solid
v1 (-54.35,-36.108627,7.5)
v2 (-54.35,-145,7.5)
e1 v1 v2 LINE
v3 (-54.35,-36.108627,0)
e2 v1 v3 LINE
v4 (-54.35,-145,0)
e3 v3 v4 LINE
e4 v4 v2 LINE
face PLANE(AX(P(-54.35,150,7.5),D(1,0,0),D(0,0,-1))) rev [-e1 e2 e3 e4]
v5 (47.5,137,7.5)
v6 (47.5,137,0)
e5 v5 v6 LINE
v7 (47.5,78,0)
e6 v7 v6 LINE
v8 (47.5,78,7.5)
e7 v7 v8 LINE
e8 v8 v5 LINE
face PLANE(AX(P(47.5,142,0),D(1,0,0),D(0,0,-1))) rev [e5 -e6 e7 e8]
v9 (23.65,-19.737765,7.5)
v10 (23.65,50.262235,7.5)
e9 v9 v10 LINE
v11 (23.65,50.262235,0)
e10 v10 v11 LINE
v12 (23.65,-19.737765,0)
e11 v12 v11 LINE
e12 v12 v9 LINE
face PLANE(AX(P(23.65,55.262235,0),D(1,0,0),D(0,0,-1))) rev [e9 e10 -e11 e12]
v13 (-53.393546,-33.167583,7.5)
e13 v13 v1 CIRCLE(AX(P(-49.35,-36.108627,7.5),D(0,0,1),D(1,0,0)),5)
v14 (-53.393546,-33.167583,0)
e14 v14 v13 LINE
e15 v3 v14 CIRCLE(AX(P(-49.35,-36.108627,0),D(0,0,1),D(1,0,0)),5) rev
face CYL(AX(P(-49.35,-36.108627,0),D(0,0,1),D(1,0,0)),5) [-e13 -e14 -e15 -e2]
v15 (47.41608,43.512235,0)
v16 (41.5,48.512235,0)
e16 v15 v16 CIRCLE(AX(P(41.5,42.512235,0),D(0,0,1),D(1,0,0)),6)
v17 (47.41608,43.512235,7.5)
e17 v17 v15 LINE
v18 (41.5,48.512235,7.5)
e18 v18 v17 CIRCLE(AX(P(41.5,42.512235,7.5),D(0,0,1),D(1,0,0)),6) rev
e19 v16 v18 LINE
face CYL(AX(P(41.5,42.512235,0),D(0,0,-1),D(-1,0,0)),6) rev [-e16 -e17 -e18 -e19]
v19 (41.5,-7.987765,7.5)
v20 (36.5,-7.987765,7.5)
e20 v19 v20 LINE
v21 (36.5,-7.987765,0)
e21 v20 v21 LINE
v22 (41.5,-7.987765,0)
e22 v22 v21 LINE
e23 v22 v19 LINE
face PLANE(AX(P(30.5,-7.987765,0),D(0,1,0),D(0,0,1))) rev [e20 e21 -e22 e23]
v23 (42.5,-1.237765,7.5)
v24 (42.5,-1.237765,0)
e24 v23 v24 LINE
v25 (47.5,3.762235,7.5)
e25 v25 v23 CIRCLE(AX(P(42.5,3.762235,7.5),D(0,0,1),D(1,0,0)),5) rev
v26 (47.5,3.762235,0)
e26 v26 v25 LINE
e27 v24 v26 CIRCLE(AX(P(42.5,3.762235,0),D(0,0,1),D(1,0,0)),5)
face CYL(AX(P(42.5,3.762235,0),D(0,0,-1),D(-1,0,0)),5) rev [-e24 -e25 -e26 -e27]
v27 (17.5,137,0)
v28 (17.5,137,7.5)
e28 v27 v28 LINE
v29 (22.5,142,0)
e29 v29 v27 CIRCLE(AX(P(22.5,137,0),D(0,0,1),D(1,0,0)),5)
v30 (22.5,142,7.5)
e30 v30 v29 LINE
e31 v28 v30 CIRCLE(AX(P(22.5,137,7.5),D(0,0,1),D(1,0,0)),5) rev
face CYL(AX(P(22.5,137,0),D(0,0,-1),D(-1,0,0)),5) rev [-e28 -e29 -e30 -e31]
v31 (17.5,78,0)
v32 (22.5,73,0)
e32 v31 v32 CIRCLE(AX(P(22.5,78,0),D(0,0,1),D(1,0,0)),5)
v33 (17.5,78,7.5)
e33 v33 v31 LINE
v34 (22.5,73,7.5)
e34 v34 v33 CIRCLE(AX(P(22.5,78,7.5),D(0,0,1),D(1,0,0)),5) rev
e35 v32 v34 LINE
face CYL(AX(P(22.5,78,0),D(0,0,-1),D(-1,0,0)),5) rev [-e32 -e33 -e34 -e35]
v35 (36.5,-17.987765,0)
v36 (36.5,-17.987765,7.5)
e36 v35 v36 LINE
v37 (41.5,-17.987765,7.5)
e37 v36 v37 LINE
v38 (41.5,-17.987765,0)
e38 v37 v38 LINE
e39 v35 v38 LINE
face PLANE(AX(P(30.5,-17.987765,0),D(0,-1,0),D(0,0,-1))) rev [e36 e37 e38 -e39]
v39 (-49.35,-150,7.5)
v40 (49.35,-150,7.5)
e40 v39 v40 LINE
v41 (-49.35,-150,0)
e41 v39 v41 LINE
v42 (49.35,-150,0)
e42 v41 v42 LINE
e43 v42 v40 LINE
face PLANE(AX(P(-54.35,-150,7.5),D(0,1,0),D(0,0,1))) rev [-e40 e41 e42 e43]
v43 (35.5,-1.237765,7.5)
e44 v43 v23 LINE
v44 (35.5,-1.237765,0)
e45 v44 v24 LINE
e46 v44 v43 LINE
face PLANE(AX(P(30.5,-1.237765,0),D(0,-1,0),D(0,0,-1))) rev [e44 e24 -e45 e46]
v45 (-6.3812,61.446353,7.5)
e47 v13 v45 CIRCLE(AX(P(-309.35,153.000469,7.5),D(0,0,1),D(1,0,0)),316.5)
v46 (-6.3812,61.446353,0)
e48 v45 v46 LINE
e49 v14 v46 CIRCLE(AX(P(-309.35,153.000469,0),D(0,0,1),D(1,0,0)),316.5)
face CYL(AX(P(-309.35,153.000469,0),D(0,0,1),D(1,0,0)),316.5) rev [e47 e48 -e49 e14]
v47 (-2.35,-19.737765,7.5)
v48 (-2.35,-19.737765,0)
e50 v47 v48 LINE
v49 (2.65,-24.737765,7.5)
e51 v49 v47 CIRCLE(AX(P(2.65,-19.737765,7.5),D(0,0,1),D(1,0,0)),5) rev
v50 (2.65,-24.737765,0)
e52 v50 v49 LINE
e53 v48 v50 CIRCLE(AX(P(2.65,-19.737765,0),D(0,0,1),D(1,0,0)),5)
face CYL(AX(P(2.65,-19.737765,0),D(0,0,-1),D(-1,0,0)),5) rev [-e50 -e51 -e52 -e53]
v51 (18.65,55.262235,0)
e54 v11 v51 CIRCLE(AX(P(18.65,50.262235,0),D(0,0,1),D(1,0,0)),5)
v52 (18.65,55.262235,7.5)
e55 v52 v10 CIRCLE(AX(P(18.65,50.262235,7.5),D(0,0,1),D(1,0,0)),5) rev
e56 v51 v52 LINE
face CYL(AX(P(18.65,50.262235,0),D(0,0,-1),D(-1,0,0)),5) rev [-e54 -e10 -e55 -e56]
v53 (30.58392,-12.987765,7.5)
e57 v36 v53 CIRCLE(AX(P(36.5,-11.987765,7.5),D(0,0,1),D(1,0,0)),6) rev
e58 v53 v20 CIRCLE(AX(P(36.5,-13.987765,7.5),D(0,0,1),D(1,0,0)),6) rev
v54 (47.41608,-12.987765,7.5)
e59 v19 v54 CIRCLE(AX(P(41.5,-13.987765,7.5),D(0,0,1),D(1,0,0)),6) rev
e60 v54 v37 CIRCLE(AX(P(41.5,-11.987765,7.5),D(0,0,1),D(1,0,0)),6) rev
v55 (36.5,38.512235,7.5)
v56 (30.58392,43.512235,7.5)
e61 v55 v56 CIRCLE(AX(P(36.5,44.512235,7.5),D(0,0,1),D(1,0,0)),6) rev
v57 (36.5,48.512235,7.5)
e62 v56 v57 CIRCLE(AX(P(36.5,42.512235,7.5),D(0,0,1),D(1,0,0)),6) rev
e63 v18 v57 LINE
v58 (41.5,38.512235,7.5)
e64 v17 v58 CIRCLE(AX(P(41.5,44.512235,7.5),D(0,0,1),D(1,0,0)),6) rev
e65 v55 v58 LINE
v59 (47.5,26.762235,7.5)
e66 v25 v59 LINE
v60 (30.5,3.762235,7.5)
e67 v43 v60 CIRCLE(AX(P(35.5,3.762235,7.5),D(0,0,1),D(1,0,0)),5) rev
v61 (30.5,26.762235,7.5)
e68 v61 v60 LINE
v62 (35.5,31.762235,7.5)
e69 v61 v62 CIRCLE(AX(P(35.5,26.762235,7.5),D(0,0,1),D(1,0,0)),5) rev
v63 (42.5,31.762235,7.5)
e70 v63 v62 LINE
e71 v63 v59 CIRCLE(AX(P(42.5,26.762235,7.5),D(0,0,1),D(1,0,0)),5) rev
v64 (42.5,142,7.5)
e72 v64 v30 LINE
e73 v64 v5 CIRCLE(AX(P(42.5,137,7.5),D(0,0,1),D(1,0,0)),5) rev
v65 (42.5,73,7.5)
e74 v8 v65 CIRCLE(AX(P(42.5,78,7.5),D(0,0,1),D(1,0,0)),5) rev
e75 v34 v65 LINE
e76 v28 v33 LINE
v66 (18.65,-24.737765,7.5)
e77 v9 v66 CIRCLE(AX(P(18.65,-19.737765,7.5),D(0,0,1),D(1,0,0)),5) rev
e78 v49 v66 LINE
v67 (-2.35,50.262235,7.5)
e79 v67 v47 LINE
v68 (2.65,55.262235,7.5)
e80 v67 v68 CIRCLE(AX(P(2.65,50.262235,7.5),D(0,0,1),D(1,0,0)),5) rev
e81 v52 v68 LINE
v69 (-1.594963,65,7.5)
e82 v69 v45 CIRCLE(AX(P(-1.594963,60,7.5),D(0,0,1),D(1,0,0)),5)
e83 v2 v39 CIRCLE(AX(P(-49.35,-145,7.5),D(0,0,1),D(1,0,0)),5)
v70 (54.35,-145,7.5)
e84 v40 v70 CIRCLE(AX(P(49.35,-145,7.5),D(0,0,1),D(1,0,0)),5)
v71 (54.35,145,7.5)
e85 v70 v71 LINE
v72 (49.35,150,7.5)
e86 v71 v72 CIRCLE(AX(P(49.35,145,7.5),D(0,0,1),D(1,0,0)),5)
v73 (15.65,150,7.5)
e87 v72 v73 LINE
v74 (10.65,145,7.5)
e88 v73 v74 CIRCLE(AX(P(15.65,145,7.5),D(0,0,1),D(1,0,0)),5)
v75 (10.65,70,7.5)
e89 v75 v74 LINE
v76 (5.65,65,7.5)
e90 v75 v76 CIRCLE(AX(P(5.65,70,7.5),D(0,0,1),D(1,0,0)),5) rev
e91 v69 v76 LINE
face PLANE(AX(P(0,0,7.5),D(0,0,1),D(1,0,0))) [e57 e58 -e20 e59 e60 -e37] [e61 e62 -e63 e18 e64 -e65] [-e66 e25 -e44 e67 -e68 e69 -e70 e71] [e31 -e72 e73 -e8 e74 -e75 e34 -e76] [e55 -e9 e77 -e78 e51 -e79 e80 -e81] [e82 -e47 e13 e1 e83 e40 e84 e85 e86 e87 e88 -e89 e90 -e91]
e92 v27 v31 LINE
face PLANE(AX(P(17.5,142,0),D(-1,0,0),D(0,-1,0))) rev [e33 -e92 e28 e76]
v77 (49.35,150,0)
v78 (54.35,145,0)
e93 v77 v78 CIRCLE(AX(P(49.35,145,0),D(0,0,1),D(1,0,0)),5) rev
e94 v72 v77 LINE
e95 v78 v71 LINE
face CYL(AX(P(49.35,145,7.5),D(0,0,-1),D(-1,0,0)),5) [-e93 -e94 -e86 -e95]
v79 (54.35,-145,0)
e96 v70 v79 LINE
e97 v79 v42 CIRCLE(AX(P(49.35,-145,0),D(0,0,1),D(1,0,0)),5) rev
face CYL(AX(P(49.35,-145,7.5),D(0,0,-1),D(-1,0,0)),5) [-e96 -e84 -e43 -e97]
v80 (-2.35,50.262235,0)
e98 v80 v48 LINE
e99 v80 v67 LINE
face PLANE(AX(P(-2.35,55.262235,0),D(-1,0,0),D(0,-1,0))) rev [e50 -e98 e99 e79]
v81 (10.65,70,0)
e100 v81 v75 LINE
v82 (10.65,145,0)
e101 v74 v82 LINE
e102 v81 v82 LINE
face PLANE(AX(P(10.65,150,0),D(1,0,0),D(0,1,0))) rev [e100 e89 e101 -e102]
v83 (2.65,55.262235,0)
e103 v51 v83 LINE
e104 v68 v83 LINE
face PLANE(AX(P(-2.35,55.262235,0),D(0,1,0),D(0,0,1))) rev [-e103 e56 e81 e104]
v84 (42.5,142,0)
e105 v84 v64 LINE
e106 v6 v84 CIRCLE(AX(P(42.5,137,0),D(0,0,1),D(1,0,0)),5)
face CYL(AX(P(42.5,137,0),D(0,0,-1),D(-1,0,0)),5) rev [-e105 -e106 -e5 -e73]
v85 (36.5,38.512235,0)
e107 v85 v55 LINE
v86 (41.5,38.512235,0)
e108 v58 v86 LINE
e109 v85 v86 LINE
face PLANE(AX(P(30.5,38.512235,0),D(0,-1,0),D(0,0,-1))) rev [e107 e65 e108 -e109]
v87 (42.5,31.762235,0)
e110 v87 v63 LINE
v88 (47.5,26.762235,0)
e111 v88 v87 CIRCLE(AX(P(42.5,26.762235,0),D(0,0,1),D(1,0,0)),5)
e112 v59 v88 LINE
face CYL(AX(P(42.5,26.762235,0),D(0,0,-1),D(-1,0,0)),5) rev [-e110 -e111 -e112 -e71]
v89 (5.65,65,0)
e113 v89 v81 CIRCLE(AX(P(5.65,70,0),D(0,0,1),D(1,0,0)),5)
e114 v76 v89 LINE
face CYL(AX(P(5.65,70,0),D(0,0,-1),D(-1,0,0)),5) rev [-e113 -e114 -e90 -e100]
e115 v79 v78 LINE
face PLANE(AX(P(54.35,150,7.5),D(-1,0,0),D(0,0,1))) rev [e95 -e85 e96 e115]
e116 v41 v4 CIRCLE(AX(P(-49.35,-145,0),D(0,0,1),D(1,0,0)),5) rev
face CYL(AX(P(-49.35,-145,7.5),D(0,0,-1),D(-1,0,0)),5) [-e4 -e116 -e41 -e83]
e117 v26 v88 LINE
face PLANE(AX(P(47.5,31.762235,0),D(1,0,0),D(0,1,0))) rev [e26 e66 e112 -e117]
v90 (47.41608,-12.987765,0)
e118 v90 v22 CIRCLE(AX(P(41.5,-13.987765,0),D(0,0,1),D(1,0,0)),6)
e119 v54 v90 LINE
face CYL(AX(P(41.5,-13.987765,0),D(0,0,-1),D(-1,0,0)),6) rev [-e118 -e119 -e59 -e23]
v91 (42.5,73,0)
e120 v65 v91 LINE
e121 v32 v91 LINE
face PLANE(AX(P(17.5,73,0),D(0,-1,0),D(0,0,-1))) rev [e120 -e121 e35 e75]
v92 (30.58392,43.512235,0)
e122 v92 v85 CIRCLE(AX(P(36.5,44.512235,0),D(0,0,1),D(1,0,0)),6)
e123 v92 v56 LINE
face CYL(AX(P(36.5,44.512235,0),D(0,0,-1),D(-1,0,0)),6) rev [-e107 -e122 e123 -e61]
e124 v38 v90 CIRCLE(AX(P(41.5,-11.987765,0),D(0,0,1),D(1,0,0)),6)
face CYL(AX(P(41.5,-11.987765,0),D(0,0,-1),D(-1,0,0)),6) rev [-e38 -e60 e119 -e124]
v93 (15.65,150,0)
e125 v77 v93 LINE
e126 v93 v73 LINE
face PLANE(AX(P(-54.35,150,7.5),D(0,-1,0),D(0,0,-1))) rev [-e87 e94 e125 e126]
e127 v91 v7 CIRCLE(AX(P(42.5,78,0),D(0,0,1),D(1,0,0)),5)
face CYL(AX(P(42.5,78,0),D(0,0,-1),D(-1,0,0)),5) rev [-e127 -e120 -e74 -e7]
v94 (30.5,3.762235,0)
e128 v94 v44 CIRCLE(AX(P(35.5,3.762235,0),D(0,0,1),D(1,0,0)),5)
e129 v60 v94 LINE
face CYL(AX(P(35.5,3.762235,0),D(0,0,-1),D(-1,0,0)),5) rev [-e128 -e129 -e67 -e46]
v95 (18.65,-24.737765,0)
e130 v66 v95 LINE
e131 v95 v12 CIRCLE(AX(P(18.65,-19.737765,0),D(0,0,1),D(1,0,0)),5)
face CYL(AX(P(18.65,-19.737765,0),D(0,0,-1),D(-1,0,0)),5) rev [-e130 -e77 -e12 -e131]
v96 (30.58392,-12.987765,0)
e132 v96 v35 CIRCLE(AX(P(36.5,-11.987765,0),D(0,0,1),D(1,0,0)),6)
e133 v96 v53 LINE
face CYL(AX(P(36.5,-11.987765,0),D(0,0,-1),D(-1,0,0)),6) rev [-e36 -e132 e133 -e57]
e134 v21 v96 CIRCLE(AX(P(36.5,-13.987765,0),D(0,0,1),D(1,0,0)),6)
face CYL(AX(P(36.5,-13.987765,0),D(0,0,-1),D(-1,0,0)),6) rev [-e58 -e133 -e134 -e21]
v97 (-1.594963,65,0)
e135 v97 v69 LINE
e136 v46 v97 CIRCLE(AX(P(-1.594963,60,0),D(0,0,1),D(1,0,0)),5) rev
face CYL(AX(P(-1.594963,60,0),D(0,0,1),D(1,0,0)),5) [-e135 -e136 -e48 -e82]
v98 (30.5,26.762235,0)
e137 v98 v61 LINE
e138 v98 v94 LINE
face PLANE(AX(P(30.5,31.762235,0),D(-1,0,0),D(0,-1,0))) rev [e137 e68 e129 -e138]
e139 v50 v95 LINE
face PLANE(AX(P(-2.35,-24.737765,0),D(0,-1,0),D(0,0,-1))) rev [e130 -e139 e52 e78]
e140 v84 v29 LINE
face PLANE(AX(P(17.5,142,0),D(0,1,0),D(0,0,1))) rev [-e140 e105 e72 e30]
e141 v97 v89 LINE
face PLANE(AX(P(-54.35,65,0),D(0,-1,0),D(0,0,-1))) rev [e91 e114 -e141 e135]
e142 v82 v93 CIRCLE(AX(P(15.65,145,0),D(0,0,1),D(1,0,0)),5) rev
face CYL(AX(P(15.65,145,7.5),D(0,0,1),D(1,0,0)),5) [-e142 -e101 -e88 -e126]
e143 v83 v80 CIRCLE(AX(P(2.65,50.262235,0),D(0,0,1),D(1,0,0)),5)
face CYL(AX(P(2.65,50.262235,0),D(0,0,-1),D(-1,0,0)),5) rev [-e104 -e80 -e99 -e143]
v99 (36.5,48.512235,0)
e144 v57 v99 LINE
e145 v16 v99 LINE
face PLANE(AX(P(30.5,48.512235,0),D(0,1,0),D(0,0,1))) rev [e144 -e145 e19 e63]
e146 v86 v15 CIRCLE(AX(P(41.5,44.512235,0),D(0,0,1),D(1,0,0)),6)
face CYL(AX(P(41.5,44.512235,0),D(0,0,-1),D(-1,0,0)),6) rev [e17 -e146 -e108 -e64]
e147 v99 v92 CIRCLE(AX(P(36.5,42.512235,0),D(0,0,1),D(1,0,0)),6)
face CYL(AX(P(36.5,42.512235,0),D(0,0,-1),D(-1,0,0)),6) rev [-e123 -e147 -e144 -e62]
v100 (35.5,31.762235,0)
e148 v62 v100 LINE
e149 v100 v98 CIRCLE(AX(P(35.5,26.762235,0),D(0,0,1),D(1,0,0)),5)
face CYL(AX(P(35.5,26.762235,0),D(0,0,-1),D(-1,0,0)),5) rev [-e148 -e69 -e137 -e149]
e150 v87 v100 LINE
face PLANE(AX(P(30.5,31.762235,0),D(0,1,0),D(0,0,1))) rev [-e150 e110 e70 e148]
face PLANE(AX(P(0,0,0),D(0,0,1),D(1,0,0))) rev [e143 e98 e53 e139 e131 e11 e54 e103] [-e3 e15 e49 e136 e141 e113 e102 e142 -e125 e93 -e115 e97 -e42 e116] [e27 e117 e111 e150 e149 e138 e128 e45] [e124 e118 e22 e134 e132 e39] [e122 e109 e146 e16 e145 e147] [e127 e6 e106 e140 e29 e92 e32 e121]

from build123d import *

# Parameters (mm, degrees)
SKETCH1_W           = 108.7
SKETCH1_H           = 300
BOSS_EXTRUDE1_DEPTH = 7.5
SKETCH2_W           = 65
SKETCH2_H           = 85
CUT_EXTRUDE1_DEPTH  = 7.5
CUT_EXTRUDE2_DEPTH  = 7.5
SKETCH5_W           = 30
SKETCH5_H           = 69
CUT_EXTRUDE3_DEPTH  = 7.5
SKETCH6_W           = 26
SKETCH6_H           = 80
CUT_EXTRUDE4_DEPTH  = 7.5
SKETCH9_W           = 17
SKETCH9_H           = 33
CUT_EXTRUDE5_DEPTH  = 7.5
SKETCH10_W          = 17
SKETCH10_H          = 10
CUT_EXTRUDE6_DEPTH  = 7.5
FILLET3_R           = 5
FILLET4_R           = 6


with BuildPart() as part:
    # Sketch1 → Boss-Extrude1 (new body)
    with BuildSketch(Plane.XY):
        Rectangle(SKETCH1_W, SKETCH1_H)
    extrude(amount=BOSS_EXTRUDE1_DEPTH)

    # Sketch2 → Cut-Extrude1 (cut)
    with BuildSketch(Plane.XY.offset(7.5)):
        with Locations((-21.85, 107.5)):
            Rectangle(SKETCH2_W, SKETCH2_H)
    extrude(amount=-CUT_EXTRUDE1_DEPTH, mode=Mode.SUBTRACT)

    # Sketch4 → Cut-Extrude2 (cut)
    with BuildSketch(Plane.XY.offset(7.5)):
        with BuildLine():
            Line((-54.35, 65), (-54.35, -34.475529761))
            ThreePointArc((-54.35, -34.475529761), (-25.449157059, 13.098498105), (-5.32998831, 65))
            Line((-5.32998831, 65), (-54.35, 65))
        make_face()
    extrude(amount=-CUT_EXTRUDE2_DEPTH, mode=Mode.SUBTRACT)

    # Sketch5 → Cut-Extrude3 (cut)
    with BuildSketch(Plane.XY.offset(7.5)):
        with Locations((32.5, 107.5)):
            Rectangle(SKETCH5_W, SKETCH5_H)
    extrude(amount=-CUT_EXTRUDE3_DEPTH, mode=Mode.SUBTRACT)

    # Sketch6 → Cut-Extrude4 (cut)
    with BuildSketch(Plane.XY.offset(7.5)):
        with Locations((10.65, 15.262235119)):
            Rectangle(SKETCH6_W, SKETCH6_H)
    extrude(amount=-CUT_EXTRUDE4_DEPTH, mode=Mode.SUBTRACT)

    # Sketch9 → Cut-Extrude5 (cut)
    with BuildSketch(Plane.XY.offset(7.5)):
        with Locations((39, 15.262235119)):
            Rectangle(SKETCH9_W, SKETCH9_H)
    extrude(amount=-CUT_EXTRUDE5_DEPTH, mode=Mode.SUBTRACT)

    # Sketch10 → Cut-Extrude6 (cut)
    with BuildSketch(Plane.XY.offset(7.5)):
        with Locations((39, 43.512235119)):
            Rectangle(SKETCH10_W, SKETCH10_H)
        with Locations((39, -12.987764881)):
            Rectangle(SKETCH10_W, SKETCH10_H)
    extrude(amount=-CUT_EXTRUDE6_DEPTH, mode=Mode.SUBTRACT)

    # Fillet3
    fillet3_edges = [part.edges().sort_by_distance(p)[0] for p in [
        (10.65, 150, 3.75),
        (10.65, 65, 3.75),
        (-5.32998831, 65, 3.75),
        (-54.35, -34.475529761, 3.75),
        (47.5, 142, 3.75),
        (47.5, 73, 3.75),
        (17.5, 73, 3.75),
        (17.5, 142, 3.75),
        (23.65, 55.262235119, 3.75),
        (23.65, -24.737764881, 3.75),
        (-2.35, -24.737764881, 3.75),
        (-2.35, 55.262235119, 3.75),
        (54.35, -150, 3.75),
        (-54.35, -150, 3.75),
        (47.5, 31.762235119, 3.75),
        (47.5, -1.237764881, 3.75),
        (30.5, -1.237764881, 3.75),
        (30.5, 31.762235119, 3.75),
        (54.35, 150, 3.75),
    ]]
    fillet(fillet3_edges, radius=FILLET3_R)

    # Fillet4
    # the kernel refuses this fillet: 6 mm, written as the material it adds along each edge
    with BuildSketch(Plane(origin=(47.5, -17.987764881, 7.5), x_dir=(0, 1, 0), z_dir=(0, 0, -1)), Plane(origin=(47.5, -7.987764881, 7.5), x_dir=(-1, 0, 0), z_dir=(0, 0, -1)), Plane(origin=(30.5, -17.987764881, 7.5), x_dir=(1, 0, 0), z_dir=(0, 0, -1)), Plane(origin=(47.5, 38.512235119, 7.5), x_dir=(0, 1, 0), z_dir=(0, 0, -1)), Plane(origin=(30.5, 38.512235119, 7.5), x_dir=(1, 0, 0), z_dir=(0, 0, -1)), Plane(origin=(47.5, 48.512235119, 7.5), x_dir=(-1, 0, 0), z_dir=(0, 0, -1))) as fillet4_piece_1:
        with BuildLine():
            CenterArc((FILLET4_R, -FILLET4_R), FILLET4_R, 90, 90)
            Line((0, -FILLET4_R), (0, 0))
            Line((0, 0), (FILLET4_R, 0))
        make_face()
    extrude(amount=7.5)
    with BuildSketch(Plane(origin=(30.5, -7.987764881, 7.5), x_dir=(1, 0, 0), z_dir=(0, 0, -1)), Plane(origin=(30.5, 48.512235119, 7.5), x_dir=(1, 0, 0), z_dir=(0, 0, -1))) as fillet4_piece_2:
        with BuildLine():
            CenterArc((FILLET4_R, FILLET4_R), FILLET4_R, 180, 90)
            Line((0, FILLET4_R), (0, 0))
            Line((0, 0), (FILLET4_R, 0))
        make_face()
    extrude(amount=7.5)


solid = part.part
